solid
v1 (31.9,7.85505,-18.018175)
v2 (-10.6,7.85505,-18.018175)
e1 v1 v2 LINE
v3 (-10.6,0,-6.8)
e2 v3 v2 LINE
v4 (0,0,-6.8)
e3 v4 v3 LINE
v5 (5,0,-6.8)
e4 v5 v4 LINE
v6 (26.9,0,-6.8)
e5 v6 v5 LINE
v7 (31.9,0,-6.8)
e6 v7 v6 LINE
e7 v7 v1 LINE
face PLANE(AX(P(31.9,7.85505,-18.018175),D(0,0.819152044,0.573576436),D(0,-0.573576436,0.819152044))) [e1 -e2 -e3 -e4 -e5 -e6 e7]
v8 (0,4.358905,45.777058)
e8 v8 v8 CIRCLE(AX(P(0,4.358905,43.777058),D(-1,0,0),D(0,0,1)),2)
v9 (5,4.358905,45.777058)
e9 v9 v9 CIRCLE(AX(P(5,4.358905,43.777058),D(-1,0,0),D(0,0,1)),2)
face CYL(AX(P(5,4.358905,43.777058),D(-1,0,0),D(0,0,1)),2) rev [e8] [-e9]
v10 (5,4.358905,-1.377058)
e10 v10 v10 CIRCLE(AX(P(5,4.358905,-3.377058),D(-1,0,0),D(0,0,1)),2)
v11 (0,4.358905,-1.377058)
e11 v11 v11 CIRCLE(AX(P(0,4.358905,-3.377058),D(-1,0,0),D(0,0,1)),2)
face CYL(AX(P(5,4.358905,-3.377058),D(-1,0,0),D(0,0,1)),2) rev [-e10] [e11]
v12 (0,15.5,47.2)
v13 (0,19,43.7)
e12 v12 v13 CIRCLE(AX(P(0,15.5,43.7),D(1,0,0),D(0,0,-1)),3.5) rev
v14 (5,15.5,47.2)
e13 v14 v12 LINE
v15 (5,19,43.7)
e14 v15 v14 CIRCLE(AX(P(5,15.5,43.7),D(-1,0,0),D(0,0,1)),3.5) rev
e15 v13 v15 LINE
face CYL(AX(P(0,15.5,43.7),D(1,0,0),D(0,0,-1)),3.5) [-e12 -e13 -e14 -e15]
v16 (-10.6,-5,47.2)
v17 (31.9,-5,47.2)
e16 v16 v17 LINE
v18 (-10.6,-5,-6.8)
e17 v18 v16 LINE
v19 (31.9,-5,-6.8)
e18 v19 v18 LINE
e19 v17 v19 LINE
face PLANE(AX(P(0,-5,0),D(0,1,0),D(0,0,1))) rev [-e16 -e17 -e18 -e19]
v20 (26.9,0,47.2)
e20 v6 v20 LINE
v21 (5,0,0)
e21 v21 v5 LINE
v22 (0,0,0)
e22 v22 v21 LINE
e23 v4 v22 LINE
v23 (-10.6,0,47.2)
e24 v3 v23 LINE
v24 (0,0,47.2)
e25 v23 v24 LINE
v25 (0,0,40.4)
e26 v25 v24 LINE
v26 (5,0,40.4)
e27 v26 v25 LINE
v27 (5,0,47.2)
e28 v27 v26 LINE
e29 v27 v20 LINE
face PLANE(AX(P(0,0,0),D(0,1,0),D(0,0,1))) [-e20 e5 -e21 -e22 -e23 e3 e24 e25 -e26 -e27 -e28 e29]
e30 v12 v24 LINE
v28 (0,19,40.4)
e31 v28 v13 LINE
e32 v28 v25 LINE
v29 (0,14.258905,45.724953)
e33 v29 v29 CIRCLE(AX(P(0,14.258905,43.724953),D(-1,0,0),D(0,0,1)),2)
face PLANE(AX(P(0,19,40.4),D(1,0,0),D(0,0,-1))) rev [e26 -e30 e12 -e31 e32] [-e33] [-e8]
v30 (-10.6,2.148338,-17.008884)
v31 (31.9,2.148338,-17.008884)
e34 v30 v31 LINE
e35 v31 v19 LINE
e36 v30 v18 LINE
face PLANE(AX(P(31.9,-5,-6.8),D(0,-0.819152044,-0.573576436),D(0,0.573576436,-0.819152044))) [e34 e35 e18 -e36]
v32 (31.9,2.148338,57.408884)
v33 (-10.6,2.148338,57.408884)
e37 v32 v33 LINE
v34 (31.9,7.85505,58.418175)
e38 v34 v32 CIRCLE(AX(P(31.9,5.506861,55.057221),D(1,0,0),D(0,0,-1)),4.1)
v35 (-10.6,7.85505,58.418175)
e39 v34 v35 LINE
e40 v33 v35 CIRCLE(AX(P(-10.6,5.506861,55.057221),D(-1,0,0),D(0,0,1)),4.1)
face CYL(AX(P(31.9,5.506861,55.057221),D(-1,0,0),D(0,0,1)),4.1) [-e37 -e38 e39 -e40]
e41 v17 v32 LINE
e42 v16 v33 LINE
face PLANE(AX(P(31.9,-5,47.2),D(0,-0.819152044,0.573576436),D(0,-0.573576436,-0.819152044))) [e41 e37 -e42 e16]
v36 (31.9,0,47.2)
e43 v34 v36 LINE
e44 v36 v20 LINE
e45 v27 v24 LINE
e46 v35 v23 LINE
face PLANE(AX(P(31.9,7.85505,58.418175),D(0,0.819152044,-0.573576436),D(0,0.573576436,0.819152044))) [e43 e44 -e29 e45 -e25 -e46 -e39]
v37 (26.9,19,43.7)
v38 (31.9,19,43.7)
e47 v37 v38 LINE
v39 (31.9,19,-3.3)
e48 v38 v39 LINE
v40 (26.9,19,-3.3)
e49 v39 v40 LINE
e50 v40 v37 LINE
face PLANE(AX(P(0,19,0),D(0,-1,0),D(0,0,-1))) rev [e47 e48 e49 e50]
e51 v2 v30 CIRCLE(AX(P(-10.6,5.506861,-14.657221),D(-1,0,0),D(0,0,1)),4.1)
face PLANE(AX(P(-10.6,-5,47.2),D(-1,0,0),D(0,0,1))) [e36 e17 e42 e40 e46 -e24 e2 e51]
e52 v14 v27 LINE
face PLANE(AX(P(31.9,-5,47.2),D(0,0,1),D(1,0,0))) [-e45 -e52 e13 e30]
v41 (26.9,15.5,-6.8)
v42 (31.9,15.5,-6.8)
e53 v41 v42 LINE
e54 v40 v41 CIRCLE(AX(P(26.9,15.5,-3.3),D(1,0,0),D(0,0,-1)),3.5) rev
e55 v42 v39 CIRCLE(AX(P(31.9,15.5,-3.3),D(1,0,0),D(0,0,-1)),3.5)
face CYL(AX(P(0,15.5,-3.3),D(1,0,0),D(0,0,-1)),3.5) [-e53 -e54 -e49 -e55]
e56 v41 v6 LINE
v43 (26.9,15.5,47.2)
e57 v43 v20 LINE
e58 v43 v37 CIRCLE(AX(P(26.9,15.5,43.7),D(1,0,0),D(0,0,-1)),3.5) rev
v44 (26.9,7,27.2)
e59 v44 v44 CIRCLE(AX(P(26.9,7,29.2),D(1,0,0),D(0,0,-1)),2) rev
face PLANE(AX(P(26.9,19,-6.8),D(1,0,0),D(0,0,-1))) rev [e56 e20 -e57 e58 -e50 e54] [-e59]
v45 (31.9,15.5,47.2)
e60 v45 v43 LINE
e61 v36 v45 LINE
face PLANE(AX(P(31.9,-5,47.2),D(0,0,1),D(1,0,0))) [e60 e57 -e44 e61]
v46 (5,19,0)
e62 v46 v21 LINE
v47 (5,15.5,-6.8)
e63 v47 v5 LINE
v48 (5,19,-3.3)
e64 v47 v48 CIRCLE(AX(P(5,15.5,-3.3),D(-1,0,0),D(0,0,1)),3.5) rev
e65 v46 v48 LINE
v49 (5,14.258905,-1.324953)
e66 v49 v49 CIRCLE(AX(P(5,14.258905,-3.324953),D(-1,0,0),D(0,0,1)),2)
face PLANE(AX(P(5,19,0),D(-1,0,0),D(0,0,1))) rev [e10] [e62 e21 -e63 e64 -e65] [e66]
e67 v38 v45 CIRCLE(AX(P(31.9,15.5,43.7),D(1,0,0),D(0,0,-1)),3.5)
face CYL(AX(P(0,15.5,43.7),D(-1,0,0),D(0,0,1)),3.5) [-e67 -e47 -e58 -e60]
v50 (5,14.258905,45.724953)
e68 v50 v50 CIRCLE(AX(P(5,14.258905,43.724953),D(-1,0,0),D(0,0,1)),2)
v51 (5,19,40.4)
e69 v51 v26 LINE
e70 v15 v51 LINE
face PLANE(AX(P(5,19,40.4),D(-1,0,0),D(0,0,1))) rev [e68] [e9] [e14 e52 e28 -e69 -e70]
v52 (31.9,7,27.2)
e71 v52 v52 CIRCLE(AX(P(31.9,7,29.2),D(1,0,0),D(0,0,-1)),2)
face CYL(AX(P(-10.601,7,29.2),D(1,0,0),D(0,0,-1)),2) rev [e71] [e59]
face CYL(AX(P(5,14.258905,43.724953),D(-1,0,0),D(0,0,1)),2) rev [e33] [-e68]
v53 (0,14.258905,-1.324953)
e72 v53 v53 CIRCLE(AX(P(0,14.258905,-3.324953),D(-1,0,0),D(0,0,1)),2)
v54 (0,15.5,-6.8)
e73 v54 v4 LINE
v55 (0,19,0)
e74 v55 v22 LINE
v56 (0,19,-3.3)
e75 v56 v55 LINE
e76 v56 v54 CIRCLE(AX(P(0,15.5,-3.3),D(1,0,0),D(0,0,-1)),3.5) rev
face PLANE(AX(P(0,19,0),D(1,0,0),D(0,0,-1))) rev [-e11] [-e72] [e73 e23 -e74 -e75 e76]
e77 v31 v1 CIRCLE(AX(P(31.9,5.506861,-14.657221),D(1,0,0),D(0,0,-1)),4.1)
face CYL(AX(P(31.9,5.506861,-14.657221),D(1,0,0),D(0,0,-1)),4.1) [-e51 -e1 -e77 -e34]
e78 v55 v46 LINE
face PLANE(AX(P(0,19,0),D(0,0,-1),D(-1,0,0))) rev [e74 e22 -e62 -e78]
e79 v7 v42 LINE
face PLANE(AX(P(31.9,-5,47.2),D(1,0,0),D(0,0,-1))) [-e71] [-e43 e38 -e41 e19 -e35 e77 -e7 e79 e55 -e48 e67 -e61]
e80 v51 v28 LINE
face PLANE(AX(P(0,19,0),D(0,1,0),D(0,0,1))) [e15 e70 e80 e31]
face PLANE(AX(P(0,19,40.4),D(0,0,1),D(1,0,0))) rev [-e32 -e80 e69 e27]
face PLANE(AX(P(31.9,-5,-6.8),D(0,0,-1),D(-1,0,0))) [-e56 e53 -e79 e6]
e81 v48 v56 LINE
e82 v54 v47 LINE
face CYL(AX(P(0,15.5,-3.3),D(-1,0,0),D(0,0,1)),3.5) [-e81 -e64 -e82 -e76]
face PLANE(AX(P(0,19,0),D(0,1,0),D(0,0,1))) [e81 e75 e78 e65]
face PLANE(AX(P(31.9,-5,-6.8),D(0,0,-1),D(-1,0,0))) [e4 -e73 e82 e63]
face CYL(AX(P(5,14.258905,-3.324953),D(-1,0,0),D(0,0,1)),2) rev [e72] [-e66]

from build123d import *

# Parameters (mm, degrees)
SKETCH_OF_SERVO_MOTOR_W               = 42.5
SKETCH_OF_SERVO_MOTOR_H               = 54
EXTRUDE_BASE_OF_FOOT_DEPTH            = 5
POSITIONS_OF_FOOT_SIDES_W             = 5
POSITIONS_OF_FOOT_SIDES_H             = 54
POSITIONS_OF_FOOT_SIDES_H_2           = 6.8
EXTRUDE_SIDES_OF_FOOT_DEPTH           = 19
FILLET_TOP_EDGES_OF_SIDES_OF_FOOT_R   = 3.5
EXTRUDE_FOOT_LIPS_DEPTH               = 42.5
FILLET_FOOT_LIPS_R                    = 4.1
HOLE_DIMENSIONS_FOR_M4_BOLT_R         = 2
EXTRUDE_CUT_HOLE_FOR_M4_BOLT_DEPTH    = 5
CUT_EXTRUDE1_REACH                    = 77.278
DIMENSIONS_FOR_OUTSIDE_FOOT_M4_HOLE_R = 2


with BuildPart() as part:
    # Sketch of Servo Motor → Extrude Base of Foot (new body)
    with BuildSketch(Plane(origin=(0, 0, 0), x_dir=(1, 0, 0), z_dir=(0, 1, 0))):
        with Locations((10.65, -20.2)):
            Rectangle(SKETCH_OF_SERVO_MOTOR_W, SKETCH_OF_SERVO_MOTOR_H)
    extrude(amount=-EXTRUDE_BASE_OF_FOOT_DEPTH)

    # Positions of Foot Sides → Extrude Sides of Foot (add)
    with BuildSketch(Plane(origin=(0, 0, 0), x_dir=(1, 0, 0), z_dir=(0, 1, 0))):
        with Locations((29.4, -20.2)):
            Rectangle(POSITIONS_OF_FOOT_SIDES_W, POSITIONS_OF_FOOT_SIDES_H)
        with Locations((2.5, 3.4)):
            Rectangle(POSITIONS_OF_FOOT_SIDES_W, POSITIONS_OF_FOOT_SIDES_H_2)
        with Locations((2.5, -43.8)):
            Rectangle(POSITIONS_OF_FOOT_SIDES_W, POSITIONS_OF_FOOT_SIDES_H_2)
    extrude(amount=EXTRUDE_SIDES_OF_FOOT_DEPTH)

    # Fillet Top Edges of Sides of Foot
    fillet_top_edges_of_sides_of_foot_edges = [part.edges().sort_by_distance(p)[0] for p in [
        (2.5, 19, -6.8),
        (2.5, 19, 47.2),
        (29.4, 19, -6.8),
        (29.4, 19, 47.2),
    ]]
    fillet(fillet_top_edges_of_sides_of_foot_edges, radius=FILLET_TOP_EDGES_OF_SIDES_OF_FOOT_R)

    # Front and Back Foot Lips → Extrude Foot Lips (add, through all)
    with BuildSketch(Plane.ZY.offset(10.6)):
        Polygon((60.767406064, 4.5), (58.418174512, 7.855050358), (47.2, 0), (47.2, -5), align=None)
        Polygon((-6.8, 0), (-6.8, -5), (-20.367406064, 4.5), (-18.018174512, 7.855050358), align=None)
    extrude(amount=-EXTRUDE_FOOT_LIPS_DEPTH)

    # Fillet Foot Lips
    # the kernel refuses this fillet: 4.1 mm, written as the material it takes off along each edge
    with BuildSketch(Plane(origin=(-20.85, 4.5, 60.767406064), x_dir=(0, 0.8191520442889908, -0.5735764363510476), z_dir=(1, 0, 0)), Plane(origin=(-20.85, 4.5, -20.367406064), x_dir=(0, -0.5735764363510438, 0.8191520442889934), z_dir=(1, 0, 0))) as fillet_foot_lips_piece_1:
        with BuildLine():
            CenterArc((FILLET_FOOT_LIPS_R, -FILLET_FOOT_LIPS_R), FILLET_FOOT_LIPS_R, 90, 90)
            Line((0, -FILLET_FOOT_LIPS_R), (0, 0))
            Line((0, 0), (FILLET_FOOT_LIPS_R, 0))
        make_face()
    extrude(amount=63, mode=Mode.SUBTRACT)

    # Hole Dimensions for M4 Bolt → Extrude Cut Hole for M4 Bolt (cut)
    with BuildSketch(Plane.ZY):
        with Locations((-3.324953132, 14.258904835)):
            Circle(HOLE_DIMENSIONS_FOR_M4_BOLT_R)
        with Locations((-3.377058396, 4.358904835)):
            Circle(HOLE_DIMENSIONS_FOR_M4_BOLT_R)
        with Locations((43.724953132, 14.258904835)):
            Circle(HOLE_DIMENSIONS_FOR_M4_BOLT_R)
        with Locations((43.777058396, 4.358904835)):
            Circle(HOLE_DIMENSIONS_FOR_M4_BOLT_R)
    extrude(amount=-EXTRUDE_CUT_HOLE_FOR_M4_BOLT_DEPTH, mode=Mode.SUBTRACT)

    # Dimensions for Outside Foot M4 Hole → Cut-Extrude1 (cut, up to next)
    with BuildSketch(Plane(origin=(31.9, 0, 0), x_dir=(0, 0, -1), z_dir=(1, 0, 0)), mode=Mode.PRIVATE) as cut_extrude1_sk1:
        with Locations((-29.2, 7)):
            Circle(DIMENSIONS_FOR_OUTSIDE_FOOT_M4_HOLE_R)
    cut_extrude1_tool1 = extrude(cut_extrude1_sk1.sketch, amount=-CUT_EXTRUDE1_REACH, mode=Mode.PRIVATE) & part.part
    add(cut_extrude1_tool1.solids().sort_by_distance((31.9, 7, 29.2))[0], mode=Mode.SUBTRACT)


solid = part.part
